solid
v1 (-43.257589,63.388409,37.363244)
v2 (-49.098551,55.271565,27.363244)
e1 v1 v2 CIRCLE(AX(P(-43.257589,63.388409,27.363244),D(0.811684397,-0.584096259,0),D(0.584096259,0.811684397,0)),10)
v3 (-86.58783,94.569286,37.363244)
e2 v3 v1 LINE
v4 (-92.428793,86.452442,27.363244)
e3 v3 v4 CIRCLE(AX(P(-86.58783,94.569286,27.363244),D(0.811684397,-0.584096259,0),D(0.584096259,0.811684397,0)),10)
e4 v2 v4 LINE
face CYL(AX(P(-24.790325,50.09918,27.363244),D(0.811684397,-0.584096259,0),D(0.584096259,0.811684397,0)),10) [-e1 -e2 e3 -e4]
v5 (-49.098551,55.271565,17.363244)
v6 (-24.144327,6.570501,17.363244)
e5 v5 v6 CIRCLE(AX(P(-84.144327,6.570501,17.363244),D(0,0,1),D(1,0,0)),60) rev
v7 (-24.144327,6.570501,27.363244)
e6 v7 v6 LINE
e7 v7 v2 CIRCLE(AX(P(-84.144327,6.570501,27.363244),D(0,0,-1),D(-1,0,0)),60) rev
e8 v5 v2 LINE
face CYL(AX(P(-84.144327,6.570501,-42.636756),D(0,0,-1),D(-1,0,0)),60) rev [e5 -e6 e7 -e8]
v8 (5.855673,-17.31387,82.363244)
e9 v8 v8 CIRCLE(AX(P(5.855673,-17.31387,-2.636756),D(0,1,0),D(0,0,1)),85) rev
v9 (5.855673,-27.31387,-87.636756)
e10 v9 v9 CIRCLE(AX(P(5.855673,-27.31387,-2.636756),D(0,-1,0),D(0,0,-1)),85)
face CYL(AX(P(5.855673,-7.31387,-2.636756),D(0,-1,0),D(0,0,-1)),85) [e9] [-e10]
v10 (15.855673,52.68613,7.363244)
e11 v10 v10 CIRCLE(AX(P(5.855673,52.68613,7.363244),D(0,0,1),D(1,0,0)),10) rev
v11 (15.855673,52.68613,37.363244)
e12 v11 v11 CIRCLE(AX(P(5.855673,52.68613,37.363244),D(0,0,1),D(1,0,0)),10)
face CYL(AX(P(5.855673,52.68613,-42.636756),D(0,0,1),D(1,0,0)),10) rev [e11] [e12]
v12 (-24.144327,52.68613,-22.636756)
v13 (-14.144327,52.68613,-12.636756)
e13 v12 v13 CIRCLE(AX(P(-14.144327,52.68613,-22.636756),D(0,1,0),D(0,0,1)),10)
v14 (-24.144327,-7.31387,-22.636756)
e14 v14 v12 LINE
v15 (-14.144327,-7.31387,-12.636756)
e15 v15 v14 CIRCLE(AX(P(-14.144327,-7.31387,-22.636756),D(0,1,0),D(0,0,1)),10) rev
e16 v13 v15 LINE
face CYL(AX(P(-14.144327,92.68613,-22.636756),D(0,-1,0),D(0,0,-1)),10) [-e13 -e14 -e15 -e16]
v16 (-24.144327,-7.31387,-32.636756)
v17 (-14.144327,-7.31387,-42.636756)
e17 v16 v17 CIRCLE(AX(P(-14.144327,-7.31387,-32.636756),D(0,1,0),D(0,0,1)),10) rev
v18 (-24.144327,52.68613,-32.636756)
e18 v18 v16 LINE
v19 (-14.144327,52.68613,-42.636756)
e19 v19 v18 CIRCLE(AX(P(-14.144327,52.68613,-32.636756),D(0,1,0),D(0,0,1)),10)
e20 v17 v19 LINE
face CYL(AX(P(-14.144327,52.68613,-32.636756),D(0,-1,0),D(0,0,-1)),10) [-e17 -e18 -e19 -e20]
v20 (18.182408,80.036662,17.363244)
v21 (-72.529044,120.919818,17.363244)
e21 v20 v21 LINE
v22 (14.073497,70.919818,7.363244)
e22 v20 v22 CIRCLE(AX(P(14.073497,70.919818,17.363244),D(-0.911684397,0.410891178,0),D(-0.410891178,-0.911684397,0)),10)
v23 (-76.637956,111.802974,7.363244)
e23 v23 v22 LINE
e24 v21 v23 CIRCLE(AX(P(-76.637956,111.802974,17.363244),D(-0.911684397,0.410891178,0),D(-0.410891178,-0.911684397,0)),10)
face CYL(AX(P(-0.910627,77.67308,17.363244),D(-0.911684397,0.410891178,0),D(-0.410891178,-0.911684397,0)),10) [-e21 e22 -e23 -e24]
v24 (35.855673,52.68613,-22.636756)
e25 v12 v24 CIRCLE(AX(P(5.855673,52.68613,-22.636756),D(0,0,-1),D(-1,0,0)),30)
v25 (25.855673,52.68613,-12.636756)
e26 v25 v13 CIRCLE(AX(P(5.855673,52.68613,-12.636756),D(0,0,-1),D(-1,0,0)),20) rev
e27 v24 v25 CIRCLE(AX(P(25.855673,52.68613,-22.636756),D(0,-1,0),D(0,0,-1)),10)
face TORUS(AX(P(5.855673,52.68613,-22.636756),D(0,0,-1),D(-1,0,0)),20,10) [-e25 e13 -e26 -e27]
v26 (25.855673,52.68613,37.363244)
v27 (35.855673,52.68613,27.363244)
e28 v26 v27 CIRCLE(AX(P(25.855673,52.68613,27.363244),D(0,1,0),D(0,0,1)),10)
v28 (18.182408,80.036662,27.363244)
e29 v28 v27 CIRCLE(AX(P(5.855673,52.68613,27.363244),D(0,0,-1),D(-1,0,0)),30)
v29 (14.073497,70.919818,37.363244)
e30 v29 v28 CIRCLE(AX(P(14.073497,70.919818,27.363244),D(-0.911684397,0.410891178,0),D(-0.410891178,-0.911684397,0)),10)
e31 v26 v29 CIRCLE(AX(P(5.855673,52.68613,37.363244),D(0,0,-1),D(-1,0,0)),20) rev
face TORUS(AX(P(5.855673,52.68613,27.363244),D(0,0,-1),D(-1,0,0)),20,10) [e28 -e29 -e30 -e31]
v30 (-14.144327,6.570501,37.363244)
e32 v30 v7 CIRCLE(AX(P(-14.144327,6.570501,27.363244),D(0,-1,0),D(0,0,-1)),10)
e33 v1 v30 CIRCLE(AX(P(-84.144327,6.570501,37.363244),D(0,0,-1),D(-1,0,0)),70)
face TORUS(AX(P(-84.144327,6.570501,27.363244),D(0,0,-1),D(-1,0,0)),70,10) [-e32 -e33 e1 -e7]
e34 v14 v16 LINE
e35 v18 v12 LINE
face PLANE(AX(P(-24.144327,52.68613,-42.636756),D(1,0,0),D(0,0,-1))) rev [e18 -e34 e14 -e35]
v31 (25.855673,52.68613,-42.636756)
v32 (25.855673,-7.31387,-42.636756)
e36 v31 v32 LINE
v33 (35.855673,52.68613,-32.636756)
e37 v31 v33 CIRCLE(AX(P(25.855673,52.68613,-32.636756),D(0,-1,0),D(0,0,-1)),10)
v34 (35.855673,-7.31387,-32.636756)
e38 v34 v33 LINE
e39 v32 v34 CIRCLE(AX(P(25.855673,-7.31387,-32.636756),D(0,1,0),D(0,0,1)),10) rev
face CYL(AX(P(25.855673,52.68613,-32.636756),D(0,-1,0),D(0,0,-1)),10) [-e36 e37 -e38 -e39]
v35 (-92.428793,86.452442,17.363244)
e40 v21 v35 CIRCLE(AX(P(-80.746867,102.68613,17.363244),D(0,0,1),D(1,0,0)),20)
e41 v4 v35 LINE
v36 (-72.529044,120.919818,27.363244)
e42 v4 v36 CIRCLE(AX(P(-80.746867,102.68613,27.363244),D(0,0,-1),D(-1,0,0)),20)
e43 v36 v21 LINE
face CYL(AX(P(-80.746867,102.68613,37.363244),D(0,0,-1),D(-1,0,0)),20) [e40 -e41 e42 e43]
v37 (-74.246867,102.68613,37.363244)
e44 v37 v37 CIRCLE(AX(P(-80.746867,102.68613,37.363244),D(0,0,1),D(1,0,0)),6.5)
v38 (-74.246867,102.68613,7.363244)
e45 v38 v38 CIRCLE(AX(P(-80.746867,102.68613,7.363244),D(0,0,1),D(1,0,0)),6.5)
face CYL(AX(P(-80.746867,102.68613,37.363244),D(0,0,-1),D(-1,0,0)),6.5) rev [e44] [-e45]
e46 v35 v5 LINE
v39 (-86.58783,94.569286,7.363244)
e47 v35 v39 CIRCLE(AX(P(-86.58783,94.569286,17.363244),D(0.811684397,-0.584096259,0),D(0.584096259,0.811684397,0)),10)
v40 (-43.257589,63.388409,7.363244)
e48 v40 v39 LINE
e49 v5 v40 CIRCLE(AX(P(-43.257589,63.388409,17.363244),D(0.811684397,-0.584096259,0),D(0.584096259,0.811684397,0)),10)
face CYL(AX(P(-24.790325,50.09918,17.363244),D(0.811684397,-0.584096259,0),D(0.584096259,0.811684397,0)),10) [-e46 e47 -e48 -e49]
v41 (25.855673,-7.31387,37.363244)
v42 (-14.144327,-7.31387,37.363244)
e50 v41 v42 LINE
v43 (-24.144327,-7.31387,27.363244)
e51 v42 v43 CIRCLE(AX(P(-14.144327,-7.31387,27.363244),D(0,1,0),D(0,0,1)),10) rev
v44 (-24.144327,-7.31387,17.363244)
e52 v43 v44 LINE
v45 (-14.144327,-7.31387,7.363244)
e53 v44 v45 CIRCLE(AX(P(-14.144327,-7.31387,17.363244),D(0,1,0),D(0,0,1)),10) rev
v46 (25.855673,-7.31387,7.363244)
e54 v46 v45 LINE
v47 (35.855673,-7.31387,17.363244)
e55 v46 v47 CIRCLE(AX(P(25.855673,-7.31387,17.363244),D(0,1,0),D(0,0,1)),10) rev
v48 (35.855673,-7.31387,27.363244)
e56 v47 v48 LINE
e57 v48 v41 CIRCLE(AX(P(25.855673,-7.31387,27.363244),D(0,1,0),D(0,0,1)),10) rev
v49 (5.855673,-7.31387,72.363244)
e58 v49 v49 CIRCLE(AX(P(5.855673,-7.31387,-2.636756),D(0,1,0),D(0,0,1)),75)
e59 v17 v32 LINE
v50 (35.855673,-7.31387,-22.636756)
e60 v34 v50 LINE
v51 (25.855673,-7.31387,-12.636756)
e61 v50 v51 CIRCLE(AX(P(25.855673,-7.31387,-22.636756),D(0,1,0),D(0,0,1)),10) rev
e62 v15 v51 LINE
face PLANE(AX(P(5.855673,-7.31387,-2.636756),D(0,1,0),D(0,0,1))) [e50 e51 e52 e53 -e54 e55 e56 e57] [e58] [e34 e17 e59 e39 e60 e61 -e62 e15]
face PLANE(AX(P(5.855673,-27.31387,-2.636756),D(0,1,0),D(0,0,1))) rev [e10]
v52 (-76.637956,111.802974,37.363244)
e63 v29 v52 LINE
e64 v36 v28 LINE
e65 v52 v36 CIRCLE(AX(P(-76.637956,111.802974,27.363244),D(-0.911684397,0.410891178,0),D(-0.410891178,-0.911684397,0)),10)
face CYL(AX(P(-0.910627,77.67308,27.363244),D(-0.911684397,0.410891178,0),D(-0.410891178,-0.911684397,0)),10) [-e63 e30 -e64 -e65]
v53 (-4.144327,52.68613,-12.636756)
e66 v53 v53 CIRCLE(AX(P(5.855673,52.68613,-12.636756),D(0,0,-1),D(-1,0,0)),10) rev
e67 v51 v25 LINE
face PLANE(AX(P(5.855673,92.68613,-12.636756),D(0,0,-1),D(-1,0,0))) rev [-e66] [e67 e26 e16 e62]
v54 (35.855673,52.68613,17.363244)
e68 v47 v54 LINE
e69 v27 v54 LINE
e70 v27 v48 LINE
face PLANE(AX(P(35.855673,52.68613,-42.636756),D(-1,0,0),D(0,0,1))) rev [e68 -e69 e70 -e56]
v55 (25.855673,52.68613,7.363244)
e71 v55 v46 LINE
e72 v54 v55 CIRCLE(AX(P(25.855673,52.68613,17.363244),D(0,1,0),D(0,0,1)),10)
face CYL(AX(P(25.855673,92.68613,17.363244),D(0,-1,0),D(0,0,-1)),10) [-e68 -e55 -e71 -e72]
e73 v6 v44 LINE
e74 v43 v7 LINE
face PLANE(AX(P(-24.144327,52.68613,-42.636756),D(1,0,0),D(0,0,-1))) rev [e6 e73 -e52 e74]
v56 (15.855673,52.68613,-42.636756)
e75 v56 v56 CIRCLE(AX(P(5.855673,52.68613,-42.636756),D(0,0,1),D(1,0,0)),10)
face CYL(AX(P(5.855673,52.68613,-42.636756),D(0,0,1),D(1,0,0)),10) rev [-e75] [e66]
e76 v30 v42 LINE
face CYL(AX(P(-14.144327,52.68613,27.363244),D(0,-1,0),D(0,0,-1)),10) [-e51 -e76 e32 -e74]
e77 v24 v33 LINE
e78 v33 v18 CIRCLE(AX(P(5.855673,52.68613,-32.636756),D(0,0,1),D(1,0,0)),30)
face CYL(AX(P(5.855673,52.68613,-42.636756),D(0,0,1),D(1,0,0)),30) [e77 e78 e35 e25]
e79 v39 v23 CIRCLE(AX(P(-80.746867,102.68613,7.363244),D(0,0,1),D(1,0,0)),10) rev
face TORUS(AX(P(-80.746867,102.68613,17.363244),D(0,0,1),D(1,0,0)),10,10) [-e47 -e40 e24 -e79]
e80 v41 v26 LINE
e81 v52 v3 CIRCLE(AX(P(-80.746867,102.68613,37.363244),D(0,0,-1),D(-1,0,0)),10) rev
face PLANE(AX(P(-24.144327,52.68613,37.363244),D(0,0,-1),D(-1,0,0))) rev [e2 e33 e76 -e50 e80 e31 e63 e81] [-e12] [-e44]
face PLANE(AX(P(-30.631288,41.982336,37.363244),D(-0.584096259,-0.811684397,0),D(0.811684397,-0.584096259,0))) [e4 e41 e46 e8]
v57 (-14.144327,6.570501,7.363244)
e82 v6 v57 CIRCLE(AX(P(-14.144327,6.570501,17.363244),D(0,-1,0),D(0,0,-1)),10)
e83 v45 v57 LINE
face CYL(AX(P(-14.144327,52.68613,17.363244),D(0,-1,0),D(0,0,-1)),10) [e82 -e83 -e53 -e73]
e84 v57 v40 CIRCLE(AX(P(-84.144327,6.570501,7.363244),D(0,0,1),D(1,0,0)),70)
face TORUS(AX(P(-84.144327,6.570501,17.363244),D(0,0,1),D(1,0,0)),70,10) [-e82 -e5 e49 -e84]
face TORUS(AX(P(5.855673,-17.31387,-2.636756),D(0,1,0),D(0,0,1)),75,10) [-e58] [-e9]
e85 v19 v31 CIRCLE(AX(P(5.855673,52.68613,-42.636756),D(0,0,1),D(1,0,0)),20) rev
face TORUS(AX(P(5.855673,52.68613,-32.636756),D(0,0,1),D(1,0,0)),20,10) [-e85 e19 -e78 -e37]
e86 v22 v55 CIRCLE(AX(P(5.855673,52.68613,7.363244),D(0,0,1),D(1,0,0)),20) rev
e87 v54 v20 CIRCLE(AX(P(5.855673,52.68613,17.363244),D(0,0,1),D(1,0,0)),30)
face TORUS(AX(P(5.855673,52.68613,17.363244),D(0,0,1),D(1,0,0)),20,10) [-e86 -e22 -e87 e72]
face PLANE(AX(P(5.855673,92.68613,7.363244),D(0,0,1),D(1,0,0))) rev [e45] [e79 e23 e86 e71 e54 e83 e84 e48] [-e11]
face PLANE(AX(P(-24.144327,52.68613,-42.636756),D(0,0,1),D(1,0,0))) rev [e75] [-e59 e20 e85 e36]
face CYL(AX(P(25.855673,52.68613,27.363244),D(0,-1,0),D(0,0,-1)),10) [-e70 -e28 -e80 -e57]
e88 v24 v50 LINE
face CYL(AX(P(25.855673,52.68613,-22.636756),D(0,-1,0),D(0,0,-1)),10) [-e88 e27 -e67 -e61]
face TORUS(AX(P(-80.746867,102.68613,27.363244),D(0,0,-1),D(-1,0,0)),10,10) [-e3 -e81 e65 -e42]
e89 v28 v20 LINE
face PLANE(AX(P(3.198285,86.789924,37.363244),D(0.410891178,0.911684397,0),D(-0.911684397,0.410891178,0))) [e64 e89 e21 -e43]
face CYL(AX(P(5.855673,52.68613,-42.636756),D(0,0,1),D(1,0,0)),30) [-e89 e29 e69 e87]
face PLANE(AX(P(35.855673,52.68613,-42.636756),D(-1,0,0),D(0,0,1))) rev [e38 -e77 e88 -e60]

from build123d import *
from build123d.topology import SkipClean

# Parameters (mm, degrees)
SKETCH1_W           = 40
SKETCH1_H           = 60
BOSS_EXTRUDE1_DEPTH = 10
SKETCH2_W           = 30
SKETCH2_H           = 40
BOSS_EXTRUDE2_DEPTH = 40
SKETCH6_R           = 15
SKETCH6_R_2         = 5
BOSS_EXTRUDE4_DEPTH = 20
SKETCH7_R           = 5
CUT_EXTRUDE2_DEPTH  = 30
CUT_EXTRUDE3_START  = 10
SKETCH8_W           = 30
SKETCH8_H           = 10
CUT_EXTRUDE3_DEPTH  = 50
BOSS_EXTRUDE5_START = 20
SKETCH10_R          = 3.25
BOSS_EXTRUDE5_DEPTH = 15
FILLET1_R           = 30
FILLET2_R           = 5
FILLET3_R           = 5
FILLET4_R           = 5
FILLET5_R           = 5
SCALE_1_SCALE       = 2
SKETCH_1_R          = 85
EXTRUDE_1_DEPTH     = 20
FILLET_1_R          = 10


# Some blends are built 0.0001 mm under size
with BuildPart() as part:
    # Sketch1 → Boss-Extrude1 (new body)
    with BuildSketch(Plane(origin=(0, 0, 0), x_dir=(1, 0, 0), z_dir=(0, 1, 0))):
        Rectangle(SKETCH1_W, SKETCH1_H)
    extrude(amount=BOSS_EXTRUDE1_DEPTH)

    # Sketch2 → Boss-Extrude2 (add)
    with BuildSketch(Plane(origin=(0, 0, 0), x_dir=(1, 0, 0), z_dir=(0, 1, 0))):
        Rectangle(SKETCH2_W, SKETCH2_H)
    extrude(amount=BOSS_EXTRUDE2_DEPTH)

    # Sketch6 → Boss-Extrude4 (add, symmetric)
    with BuildSketch(Plane.XY):
        with Locations((0, 40)):
            Circle(SKETCH6_R)
        with Locations((0, 40)):
            Circle(SKETCH6_R_2, mode=Mode.SUBTRACT)
    extrude(amount=BOSS_EXTRUDE4_DEPTH, both=True)

    # Sketch7 → Cut-Extrude2 (cut, symmetric)
    with SkipClean():  # the faces are left unmerged after this step: merging them gives an invalid solid
        with BuildSketch(Plane.XY):
            with Locations((0, 40)):
                Circle(SKETCH7_R)
        extrude(amount=CUT_EXTRUDE2_DEPTH, both=True, mode=Mode.SUBTRACT)

    # Sketch8 → Cut-Extrude3 (cut)
    with BuildSketch(Plane(origin=(0, 0, 0), x_dir=(1, 0, 0), z_dir=(0, 1, 0)).offset(CUT_EXTRUDE3_START)):
        Rectangle(SKETCH8_W, SKETCH8_H)
    extrude(amount=CUT_EXTRUDE3_DEPTH, mode=Mode.SUBTRACT)

    # Sketch10 → Boss-Extrude5 (add)
    with BuildSketch(Plane.XY.offset(BOSS_EXTRUDE5_START)):
        with BuildLine():
            Line((-49.142232779, 56.88315603), (-8.761443884, 27.824734045))
            ThreePointArc((-8.761443884, 27.824734045), (-12.990381057, 47.5), (6.163367673, 53.675265955))
            Line((6.163367673, 53.675265955), (-39.192358407, 74.11684397))
            ThreePointArc((-39.192358407, 74.11684397), (-51.961524227, 70), (-49.142232779, 56.88315603))
        make_face()
        with Locations((-43.301270189, 65)):
            Circle(SKETCH10_R, mode=Mode.SUBTRACT)
    extrude(amount=-BOSS_EXTRUDE5_DEPTH)

    # Fillet1
    fillet1_edges = [part.edges().sort_by_distance(p)[0] for p in [
        (-15, 32.314061796, 12.5),
    ]]
    fillet(fillet1_edges, radius=FILLET1_R)

    # Fillet2
    fillet2_edges = [part.edges().sort_by_distance(p)[0] for p in [
        (-38.309672505, 49.087936664, 20),
        (-38.309672505, 49.087936664, 5),
        (-18.300874237, 30.622707436, 5),
        (-18.300874237, 30.622707436, 20),
        (15, 25, 20),
        (12.598621256, 48.140930073, 20),
        (15, 25, 5),
        (12.598621256, 48.140930073, 5),
        (-51.961524227, 70, 20),
        (-16.514495367, 63.896054962, 5),
        (-51.961524227, 70, 5),
        (-16.514495367, 63.896054962, 20),
        (-15, 13.471092695, 20),
        (-15, 13.471092695, 5),
    ]]
    fillet(fillet2_edges, radius=FILLET2_R)

    # Fillet3
    fillet3_edges = [part.edges().sort_by_distance(p)[0] for p in [
        (15, 25, -20),
        (-15, 25, -20),
        (0, 55, -20),
        (-15, 25, -5),
        (0, 55, -5),
        (15, 25, -5),
    ]]
    fillet(fillet3_edges, radius=FILLET3_R)

    # Fillet4
    fillet4_edges = [part.edges().sort_by_distance(p)[0] for p in [
        (-20, 10, 0),
        (0, 10, 30),
        (20, 10, 0),
        (0, 10, -30),
    ]]
    fillet(fillet4_edges, radius=FILLET4_R - 0.0001)  # a hair under: the kernel refuses the full size

    # Fillet5
    # the kernel refuses this fillet: 5 mm, written as the material it takes off along each edge
    with BuildSketch(Plane(origin=(15, 10, 25), x_dir=(0, 0, 1), z_dir=(-1, 0, 0))) as fillet5_piece_1:
        with BuildLine():
            CenterArc((0.0001, -4.9999), 4.9999, 0, 90)
            Line((5, -4.9999), (5, 0))
            Line((5, 0), (0.0001, 0))
        make_face()
    revolve(axis=Axis((15, 10, 25), (0, 1, 0)), revolution_arc=90, mode=Mode.SUBTRACT)
    with BuildSketch(Plane(origin=(-15, 10, 25), x_dir=(-1, 0, 0), z_dir=(0, 0, -1))) as fillet5_piece_2:
        with BuildLine():
            CenterArc((0.0001, -4.9999), 4.9999, 0, 90)
            Line((5, -4.9999), (5, 0))
            Line((5, 0), (0.0001, 0))
        make_face()
    revolve(axis=Axis((-15, 10, 25), (0, 1, 0)), revolution_arc=90, mode=Mode.SUBTRACT)
    with BuildSketch(Plane(origin=(15, 10, -25), x_dir=(1, 0, 0), z_dir=(0, 0, 1))) as fillet5_piece_3:
        with BuildLine():
            CenterArc((0.0001, -4.9999), 4.9999, 0, 90)
            Line((5, -4.9999), (5, 0))
            Line((5, 0), (0.0001, 0))
        make_face()
    revolve(axis=Axis((15, 10, -25), (0, 1, 0)), revolution_arc=90, mode=Mode.SUBTRACT)
    with BuildSketch(Plane(origin=(-15, 10, -25), x_dir=(0, 0, -1), z_dir=(1, 0, 0))) as fillet5_piece_4:
        with BuildLine():
            CenterArc((0.0001, -4.9999), 4.9999, 0, 90)
            Line((5, -4.9999), (5, 0))
            Line((5, 0), (0.0001, 0))
        make_face()
    revolve(axis=Axis((-15, 10, -25), (0, 1, 0)), revolution_arc=90, mode=Mode.SUBTRACT)
    with BuildSketch(Plane(origin=(-20, -12.5, -30), x_dir=(0, 0, 1), z_dir=(0, 1, 0)), Plane(origin=(20, -12.5, -30), x_dir=(-1, 0, 0), z_dir=(0, 1, 0))) as fillet5_piece_5:
        with BuildLine():
            CenterArc((FILLET5_R, FILLET5_R), FILLET5_R, 180, 90)
            Line((0, FILLET5_R), (0, 0))
            Line((0, 0), (FILLET5_R, 0))
        make_face()
    extrude(amount=22.5, mode=Mode.SUBTRACT)
    with BuildSketch(Plane(origin=(20, -12.5, 30), x_dir=(-1, 0, 0), z_dir=(0, 1, 0)), Plane(origin=(-20, -12.5, 30), x_dir=(0, 0, -1), z_dir=(0, 1, 0))) as fillet5_piece_6:
        with BuildLine():
            CenterArc((FILLET5_R, -FILLET5_R), FILLET5_R, 90, 90)
            Line((0, -FILLET5_R), (0, 0))
            Line((0, 0), (FILLET5_R, 0))
        make_face()
    extrude(amount=22.5, mode=Mode.SUBTRACT)


with BuildPart() as part_1:
    # 缩放比例1: scaled about (-5.855669763, 27.313859585, 2.636754643)
    add(part.part.scale(SCALE_1_SCALE).moved(Location((5.855669763, -27.313859585, -2.636754643))))

    # 草图1 → 凸台-拉伸1 (add)
    with BuildSketch(Plane.XZ.offset(27.313870031)):
        with Locations(Location((5.855672976, -2.63675609, 0), (0, 0, 270))):
            Circle(SKETCH_1_R)
    extrude(amount=-EXTRUDE_1_DEPTH)

    # 圆角1
    fillet_1_edges = [part_1.edges().sort_by_distance(p)[0] for p in [
        (5.855672976, -7.313870031, 82.36324391),
    ]]
    fillet(fillet_1_edges, radius=FILLET_1_R)


solid = part_1.part
